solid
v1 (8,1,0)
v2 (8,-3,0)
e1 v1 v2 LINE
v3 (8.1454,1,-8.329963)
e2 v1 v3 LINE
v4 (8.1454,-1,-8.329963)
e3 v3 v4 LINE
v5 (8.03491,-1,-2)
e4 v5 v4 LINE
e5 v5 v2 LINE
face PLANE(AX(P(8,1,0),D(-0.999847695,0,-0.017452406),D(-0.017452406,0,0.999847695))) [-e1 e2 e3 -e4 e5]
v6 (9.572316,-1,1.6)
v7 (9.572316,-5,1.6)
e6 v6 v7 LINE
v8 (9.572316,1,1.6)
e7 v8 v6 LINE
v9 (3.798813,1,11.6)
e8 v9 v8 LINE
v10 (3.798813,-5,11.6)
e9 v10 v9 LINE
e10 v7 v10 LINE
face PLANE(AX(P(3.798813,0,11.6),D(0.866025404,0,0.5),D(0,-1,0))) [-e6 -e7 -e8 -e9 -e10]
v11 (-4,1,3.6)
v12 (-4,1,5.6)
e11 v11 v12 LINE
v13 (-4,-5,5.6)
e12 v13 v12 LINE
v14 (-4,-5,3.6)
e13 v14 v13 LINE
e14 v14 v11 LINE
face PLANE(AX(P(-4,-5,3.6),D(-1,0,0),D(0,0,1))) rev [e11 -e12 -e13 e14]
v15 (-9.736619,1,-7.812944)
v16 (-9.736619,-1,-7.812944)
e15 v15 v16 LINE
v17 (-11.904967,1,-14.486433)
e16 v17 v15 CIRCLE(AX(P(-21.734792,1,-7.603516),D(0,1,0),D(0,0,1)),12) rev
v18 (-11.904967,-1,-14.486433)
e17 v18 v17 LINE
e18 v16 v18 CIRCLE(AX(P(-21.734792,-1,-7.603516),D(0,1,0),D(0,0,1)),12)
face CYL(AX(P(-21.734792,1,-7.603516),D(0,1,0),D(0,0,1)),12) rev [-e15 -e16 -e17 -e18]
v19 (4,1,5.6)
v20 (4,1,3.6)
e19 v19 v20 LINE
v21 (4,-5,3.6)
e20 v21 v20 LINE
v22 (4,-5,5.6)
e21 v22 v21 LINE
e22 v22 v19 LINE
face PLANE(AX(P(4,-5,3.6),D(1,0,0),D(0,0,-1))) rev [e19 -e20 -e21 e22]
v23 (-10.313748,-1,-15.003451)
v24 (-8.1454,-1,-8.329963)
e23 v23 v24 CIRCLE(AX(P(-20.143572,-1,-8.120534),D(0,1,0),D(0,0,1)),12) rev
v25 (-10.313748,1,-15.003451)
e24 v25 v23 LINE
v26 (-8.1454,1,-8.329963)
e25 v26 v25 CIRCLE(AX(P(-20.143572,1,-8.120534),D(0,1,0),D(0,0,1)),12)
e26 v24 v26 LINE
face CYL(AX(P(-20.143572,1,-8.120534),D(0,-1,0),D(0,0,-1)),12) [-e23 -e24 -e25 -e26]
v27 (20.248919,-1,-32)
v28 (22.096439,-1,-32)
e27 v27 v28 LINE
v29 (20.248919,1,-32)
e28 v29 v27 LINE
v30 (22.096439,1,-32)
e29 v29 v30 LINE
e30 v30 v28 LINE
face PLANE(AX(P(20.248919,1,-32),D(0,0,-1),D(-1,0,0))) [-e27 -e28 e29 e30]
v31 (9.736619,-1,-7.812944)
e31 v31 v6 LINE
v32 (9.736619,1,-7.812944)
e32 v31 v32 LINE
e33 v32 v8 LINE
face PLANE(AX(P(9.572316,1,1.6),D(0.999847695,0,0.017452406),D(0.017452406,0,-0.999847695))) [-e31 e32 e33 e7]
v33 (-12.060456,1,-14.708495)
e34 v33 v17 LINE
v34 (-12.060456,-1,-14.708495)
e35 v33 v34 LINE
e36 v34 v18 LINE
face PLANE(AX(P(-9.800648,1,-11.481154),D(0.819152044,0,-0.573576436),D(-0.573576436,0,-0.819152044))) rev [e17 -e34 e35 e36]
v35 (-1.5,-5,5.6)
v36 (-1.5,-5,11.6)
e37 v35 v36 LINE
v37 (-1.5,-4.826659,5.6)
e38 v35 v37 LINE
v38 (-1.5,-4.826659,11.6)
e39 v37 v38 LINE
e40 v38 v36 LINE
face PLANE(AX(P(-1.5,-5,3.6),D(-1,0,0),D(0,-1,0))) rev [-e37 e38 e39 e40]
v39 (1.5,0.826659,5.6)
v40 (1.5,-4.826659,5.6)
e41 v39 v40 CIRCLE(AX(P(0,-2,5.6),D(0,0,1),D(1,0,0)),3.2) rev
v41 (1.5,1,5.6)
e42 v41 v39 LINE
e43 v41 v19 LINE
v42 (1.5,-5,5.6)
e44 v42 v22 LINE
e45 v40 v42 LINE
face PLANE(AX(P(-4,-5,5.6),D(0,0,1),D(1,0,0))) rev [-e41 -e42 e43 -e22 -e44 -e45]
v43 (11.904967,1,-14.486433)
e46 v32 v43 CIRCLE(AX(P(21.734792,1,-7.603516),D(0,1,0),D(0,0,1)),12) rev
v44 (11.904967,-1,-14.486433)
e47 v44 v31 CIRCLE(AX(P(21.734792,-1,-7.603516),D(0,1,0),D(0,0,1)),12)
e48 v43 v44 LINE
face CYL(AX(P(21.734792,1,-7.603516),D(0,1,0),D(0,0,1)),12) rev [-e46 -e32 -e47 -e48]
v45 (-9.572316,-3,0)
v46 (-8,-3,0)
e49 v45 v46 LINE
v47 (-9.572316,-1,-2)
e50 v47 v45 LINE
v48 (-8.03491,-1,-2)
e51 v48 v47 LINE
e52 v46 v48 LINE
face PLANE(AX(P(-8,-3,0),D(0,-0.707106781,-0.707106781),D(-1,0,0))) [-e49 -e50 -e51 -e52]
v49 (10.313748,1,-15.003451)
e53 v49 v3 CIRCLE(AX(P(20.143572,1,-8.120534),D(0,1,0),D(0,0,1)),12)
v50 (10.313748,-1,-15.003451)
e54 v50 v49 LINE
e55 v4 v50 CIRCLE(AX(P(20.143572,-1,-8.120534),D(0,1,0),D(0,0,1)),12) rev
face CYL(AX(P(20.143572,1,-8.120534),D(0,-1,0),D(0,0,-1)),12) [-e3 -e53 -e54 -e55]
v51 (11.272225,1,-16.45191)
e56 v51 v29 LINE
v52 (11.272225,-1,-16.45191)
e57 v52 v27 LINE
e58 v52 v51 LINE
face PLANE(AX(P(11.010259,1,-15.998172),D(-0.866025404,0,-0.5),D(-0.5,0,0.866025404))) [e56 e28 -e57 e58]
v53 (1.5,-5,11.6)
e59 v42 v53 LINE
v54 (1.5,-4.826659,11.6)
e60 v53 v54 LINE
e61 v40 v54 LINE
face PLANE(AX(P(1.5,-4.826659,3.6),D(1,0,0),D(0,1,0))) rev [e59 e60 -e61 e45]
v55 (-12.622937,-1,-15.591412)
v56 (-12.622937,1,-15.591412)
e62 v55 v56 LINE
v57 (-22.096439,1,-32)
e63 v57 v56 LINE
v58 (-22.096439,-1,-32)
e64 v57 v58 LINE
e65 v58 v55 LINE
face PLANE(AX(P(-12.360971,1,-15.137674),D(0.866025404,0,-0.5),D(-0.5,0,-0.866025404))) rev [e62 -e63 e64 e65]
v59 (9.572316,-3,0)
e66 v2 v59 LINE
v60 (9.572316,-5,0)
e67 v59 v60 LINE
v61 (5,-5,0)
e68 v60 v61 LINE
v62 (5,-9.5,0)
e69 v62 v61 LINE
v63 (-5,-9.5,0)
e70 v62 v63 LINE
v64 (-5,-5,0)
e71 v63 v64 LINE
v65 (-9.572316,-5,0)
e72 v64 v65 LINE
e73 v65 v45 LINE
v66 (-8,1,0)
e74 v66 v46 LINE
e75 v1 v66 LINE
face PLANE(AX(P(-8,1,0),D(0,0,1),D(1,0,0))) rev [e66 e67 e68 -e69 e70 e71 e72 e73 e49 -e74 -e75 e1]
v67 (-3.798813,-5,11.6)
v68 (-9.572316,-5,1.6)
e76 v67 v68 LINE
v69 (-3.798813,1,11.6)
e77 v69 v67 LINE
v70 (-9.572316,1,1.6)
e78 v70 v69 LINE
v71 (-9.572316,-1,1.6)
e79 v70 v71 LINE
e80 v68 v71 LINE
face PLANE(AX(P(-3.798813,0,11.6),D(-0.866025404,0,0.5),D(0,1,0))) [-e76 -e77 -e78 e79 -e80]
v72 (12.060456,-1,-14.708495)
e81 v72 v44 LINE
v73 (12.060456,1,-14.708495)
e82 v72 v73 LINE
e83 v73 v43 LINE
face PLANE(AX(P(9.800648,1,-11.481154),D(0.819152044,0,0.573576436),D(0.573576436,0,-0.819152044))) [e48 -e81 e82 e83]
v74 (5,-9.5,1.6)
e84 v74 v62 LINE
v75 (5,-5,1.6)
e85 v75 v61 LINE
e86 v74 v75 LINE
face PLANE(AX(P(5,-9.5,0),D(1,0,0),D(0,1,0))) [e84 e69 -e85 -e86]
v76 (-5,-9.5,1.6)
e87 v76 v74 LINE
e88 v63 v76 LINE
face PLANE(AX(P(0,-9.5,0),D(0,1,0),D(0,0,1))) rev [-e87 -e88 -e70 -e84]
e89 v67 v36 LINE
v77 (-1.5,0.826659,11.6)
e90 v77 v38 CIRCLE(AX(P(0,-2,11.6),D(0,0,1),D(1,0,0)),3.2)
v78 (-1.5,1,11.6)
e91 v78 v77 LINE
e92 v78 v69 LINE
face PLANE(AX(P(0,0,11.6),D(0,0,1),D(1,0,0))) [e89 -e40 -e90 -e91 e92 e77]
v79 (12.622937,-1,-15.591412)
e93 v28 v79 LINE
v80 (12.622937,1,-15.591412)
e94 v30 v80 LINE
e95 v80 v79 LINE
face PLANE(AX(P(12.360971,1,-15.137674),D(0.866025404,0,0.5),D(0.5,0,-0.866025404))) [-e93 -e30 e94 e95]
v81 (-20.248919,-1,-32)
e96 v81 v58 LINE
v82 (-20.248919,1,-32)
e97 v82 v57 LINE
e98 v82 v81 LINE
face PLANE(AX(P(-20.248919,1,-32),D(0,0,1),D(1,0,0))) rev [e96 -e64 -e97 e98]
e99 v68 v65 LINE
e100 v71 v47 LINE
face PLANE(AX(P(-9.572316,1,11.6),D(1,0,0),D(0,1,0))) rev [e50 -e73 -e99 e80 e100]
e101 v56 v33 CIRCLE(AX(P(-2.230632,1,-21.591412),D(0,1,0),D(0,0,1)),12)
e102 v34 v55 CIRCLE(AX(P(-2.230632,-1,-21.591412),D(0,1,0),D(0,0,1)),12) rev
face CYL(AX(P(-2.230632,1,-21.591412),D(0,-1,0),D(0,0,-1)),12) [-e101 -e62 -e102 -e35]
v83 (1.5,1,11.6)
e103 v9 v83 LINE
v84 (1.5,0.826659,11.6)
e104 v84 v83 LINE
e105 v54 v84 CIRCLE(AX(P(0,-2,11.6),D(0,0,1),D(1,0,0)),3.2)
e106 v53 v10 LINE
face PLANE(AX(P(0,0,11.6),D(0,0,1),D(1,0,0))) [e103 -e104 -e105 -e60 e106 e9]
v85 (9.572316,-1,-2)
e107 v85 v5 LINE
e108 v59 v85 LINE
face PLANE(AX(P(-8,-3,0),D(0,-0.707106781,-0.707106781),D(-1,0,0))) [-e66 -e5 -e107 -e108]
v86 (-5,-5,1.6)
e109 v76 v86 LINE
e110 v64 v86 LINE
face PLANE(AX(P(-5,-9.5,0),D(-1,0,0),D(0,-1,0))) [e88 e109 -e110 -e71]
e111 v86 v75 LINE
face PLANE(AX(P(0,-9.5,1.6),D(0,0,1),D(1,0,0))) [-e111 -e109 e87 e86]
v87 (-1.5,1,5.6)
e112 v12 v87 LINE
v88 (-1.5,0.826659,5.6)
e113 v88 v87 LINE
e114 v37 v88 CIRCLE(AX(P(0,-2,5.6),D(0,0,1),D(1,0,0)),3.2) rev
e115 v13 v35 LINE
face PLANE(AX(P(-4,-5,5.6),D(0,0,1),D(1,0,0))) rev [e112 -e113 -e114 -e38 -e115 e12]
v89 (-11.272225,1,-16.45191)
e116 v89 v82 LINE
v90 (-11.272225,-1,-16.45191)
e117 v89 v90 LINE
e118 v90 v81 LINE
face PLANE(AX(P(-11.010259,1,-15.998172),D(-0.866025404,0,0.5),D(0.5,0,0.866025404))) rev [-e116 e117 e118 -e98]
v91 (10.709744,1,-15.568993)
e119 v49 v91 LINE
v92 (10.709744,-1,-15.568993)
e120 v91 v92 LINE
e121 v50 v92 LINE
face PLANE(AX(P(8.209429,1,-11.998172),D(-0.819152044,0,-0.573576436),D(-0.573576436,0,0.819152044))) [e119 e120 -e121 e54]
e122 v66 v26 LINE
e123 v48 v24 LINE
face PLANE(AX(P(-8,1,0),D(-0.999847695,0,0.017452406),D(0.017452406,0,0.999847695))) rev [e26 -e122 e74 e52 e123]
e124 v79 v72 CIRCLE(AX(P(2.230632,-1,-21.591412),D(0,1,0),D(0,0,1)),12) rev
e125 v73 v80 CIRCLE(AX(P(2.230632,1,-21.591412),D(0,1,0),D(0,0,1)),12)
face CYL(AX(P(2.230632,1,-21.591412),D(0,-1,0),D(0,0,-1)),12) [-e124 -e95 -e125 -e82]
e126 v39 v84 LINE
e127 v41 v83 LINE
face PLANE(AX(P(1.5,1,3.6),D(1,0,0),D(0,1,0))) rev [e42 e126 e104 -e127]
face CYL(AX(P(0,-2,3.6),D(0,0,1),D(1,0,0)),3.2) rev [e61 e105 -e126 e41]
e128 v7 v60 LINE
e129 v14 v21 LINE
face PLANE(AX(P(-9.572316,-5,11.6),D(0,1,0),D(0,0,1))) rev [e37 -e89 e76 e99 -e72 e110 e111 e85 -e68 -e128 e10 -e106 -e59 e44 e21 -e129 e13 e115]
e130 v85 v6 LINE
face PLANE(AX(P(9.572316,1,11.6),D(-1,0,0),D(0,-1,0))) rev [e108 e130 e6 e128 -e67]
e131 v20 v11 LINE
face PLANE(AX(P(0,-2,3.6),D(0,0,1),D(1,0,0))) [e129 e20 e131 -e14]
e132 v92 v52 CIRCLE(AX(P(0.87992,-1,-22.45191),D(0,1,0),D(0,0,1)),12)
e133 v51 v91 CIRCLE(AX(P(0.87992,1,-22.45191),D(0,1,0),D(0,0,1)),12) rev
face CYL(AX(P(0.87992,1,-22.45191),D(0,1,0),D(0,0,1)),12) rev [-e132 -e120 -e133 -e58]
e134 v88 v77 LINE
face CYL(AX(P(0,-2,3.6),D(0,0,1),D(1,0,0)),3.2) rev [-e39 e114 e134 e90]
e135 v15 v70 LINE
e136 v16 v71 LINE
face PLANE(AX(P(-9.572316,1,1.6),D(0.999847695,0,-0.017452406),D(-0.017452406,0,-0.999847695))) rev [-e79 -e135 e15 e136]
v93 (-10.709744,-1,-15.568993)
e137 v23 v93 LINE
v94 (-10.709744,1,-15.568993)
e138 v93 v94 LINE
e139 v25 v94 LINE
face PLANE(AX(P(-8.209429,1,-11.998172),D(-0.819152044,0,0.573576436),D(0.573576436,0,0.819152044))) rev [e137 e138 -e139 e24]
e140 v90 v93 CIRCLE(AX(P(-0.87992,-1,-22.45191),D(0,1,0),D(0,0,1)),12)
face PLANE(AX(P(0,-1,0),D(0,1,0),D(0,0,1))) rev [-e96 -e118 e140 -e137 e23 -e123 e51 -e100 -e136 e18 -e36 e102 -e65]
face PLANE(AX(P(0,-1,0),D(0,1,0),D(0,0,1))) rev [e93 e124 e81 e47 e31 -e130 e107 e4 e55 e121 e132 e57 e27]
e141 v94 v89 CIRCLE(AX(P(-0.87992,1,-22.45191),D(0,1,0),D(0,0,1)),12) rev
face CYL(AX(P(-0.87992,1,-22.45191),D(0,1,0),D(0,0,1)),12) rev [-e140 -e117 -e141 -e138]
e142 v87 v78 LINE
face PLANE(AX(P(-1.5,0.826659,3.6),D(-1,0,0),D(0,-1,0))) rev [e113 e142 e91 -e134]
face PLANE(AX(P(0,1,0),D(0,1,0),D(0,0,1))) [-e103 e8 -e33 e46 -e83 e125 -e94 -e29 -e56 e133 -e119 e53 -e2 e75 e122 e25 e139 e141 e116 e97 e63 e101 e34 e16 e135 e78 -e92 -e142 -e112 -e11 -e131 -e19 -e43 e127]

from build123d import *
from OCP.BRepFilletAPI import BRepFilletAPI_MakeChamfer

# Parameters (mm, degrees)
BOSS_EXTRUDE1_DEPTH             = 1
BOSS_EXTRUDE2_REACH             = 42.227
SKETCH2_W                       = 19.144631242
SKETCH2_H                       = 6
BOSS_EXTRUDE2_DIRECTION_2_DEPTH = 10
CUT_EXTRUDE1_DEPTH              = 8
CUT_EXTRUDE2_DEPTH              = 40.207813431
CUT_EXTRUDE2_DEPTH_BACK         = 40.207813431
SKETCH4_W                       = 8
SKETCH4_H                       = 2
CHAMFER1_SIZE                   = 2
CHAMFER2_SIZE                   = 10
CHAMFER2_SIZE2                  = 5.773502692
FILLET1_START                   = -1
FILLET1_DEPTH                   = 3
FILLET1_2_DEPTH                 = 2
BOSS_EXTRUDE3_START             = -6
SKETCH5_W                       = 10
SKETCH5_H                       = 1.6
BOSS_EXTRUDE3_DEPTH             = 10.5


with BuildPart() as part:
    # Sketch1 → Boss-Extrude1 (new, symmetric)
    with BuildSketch(Plane(origin=(0, 0, 0), x_dir=(1, 0, 0), z_dir=(0, 1, 0))):
        Polygon((-8, 0), (0, 0), (0, -1.6), (-9.572315621, -1.6), (-9.800648012, 11.481153904), (-12.360970922, 15.137673965), (-22.096439397, 32), (-20.248918536, 32), (-11.01025903, 15.998172342), (-8.209428877, 11.998172342), align=None)
    boss_extrude1 = extrude(amount=BOSS_EXTRUDE1_DEPTH, both=True)

    # Mirror1: Boss-Extrude1 across plane
    add(boss_extrude1.mirror(Plane(origin=(0, 1, 0), x_dir=(0, 0, 1), z_dir=(-1, 0, 0))))

    # Boss-Extrude2: up to this face of the body (flat: up to its plane)
    boss_extrude2_end = Plane(part.part.faces().sort_by_distance((0, 0, 0))[0])
    # Sketch2 → Boss-Extrude2 (add, up to the picked face)
    with BuildSketch(Plane.XY.offset(1.6), mode=Mode.PRIVATE) as boss_extrude2_sk1:
        with Locations((0, -2)):
            Rectangle(SKETCH2_W, SKETCH2_H)
    boss_extrude2_tool1 = split(extrude(boss_extrude2_sk1.sketch, amount=-BOSS_EXTRUDE2_REACH, mode=Mode.PRIVATE), bisect_by=boss_extrude2_end, keep=Keep.BOTH, mode=Mode.PRIVATE)
    add(boss_extrude2_tool1.solids().sort_by(Axis((0, -2, 1.6), (0, 0, -1)))[0])

    # Sketch2 → Boss-Extrude2 direction 2 (add)
    with BuildSketch(Plane.XY.offset(1.6)):
        with Locations((0, -2)):
            Rectangle(SKETCH2_W, SKETCH2_H)
    extrude(amount=BOSS_EXTRUDE2_DIRECTION_2_DEPTH)

    # Sketch3 → Cut-Extrude1 (cut)
    with BuildSketch(Plane.XY.offset(11.6)):
        with BuildLine():
            Line((-1.5, 0.826658805), (-1.5, 1))
            Line((-1.5, 1), (1.5, 1))
            Line((1.5, 1), (1.5, 0.826658805))
            ThreePointArc((1.5, 0.826658805), (3.2, -2), (1.5, -4.826658805))
            Line((1.5, -4.826658805), (1.5, -5))
            Line((1.5, -5), (-1.5, -5))
            Line((-1.5, -5), (-1.5, -4.826658805))
            ThreePointArc((-1.5, -4.826658805), (-3.2, -2), (-1.5, 0.826658805))
        make_face()
    extrude(amount=-CUT_EXTRUDE1_DEPTH, mode=Mode.SUBTRACT)

    # Sketch4 → Cut-Extrude2 (cut, two sides: drawn at the far end of the back side and taken through both)
    with BuildSketch(Plane(origin=(0, 0, 0), x_dir=(1, 0, 0), z_dir=(0, 1, 0)).offset(-CUT_EXTRUDE2_DEPTH_BACK)):
        with Locations((0, -4.6)):
            Rectangle(SKETCH4_W, SKETCH4_H)
    extrude(amount=CUT_EXTRUDE2_DEPTH + CUT_EXTRUDE2_DEPTH_BACK, mode=Mode.SUBTRACT)

    # Chamfer1
    chamfer1_edges = [part.edges().sort_by_distance(p)[0] for p in [
        (-8.78615781, -1, 0),
        (8.78615781, -1, 0),
    ]]
    chamfer(chamfer1_edges, length=CHAMFER1_SIZE)

    # Chamfer2: one chamfer whose edges measure the first distance from different faces: ONE call of the kernel's chamfer builder (chamfer() names one face for all edges)
    chamfer2_edges_1 = [part.edges().sort_by_distance(p)[0] for p in [
        (9.572315621, -2, 11.6),
    ]]
    chamfer2_side_1 = [part.faces().sort_by_distance(p)[0] for p in [
        (9.572315621, -2.083820663, 5.844834308),
    ]]
    chamfer2_edges_2 = [part.edges().sort_by_distance(p)[0] for p in [
        (-9.572315621, -2, 11.6),
    ]]
    chamfer2_side_2 = [part.faces().sort_by_distance(p)[0] for p in [
        (-9.572315621, -2.083820663, 5.844834308),
    ]]
    chamfer2 = BRepFilletAPI_MakeChamfer(part.part.solid().wrapped)
    for e in chamfer2_edges_1:
        chamfer2.Add(CHAMFER2_SIZE, CHAMFER2_SIZE2, e.wrapped, chamfer2_side_1[0].wrapped)  # the first distance lies on this face
    for e in chamfer2_edges_2:
        chamfer2.Add(CHAMFER2_SIZE, CHAMFER2_SIZE2, e.wrapped, chamfer2_side_2[0].wrapped)  # the first distance lies on this face
    add(Compound.cast(chamfer2.Shape()), mode=Mode.REPLACE)

    # Fillet1: read off the stored shape, not the designer's step
    # Fillet1 outline → Fillet1 (cut)
    with BuildSketch(Plane(origin=(0, 0, 0), x_dir=(1, 0, 0), z_dir=(0, 1, 0)).offset(FILLET1_START)):
        with BuildLine():
            Line((12.360970922, 15.137673965), (12.622936579, 15.591411793))
            ThreePointArc((12.622936579, 15.591411793), (12.351329084, 15.143816493), (12.060456265, 14.708494557))
            Line((12.060456265, 14.708494557), (12.360970922, 15.137673965))
        make_face()
        with BuildLine():
            ThreePointArc((8.145400044, 8.329962936), (8.73089419, 11.828737991), (10.313747854, 15.003451295))
            Line((10.313747854, 15.003451295), (8.209428877, 11.998172342))
            Line((8.209428877, 11.998172342), (8.145400044, 8.329962936))
        make_face()
        with BuildLine():
            Line((-12.360970922, 15.137673965), (-12.060456265, 14.708494557))
            ThreePointArc((-12.060456265, 14.708494557), (-12.351329084, 15.143816493), (-12.622936579, 15.591411793))
            Line((-12.622936579, 15.591411793), (-12.360970922, 15.137673965))
        make_face()
        with BuildLine():
            Line((-8.209428877, 11.998172342), (-10.313747854, 15.003451295))
            ThreePointArc((-10.313747854, 15.003451295), (-8.73089419, 11.828737991), (-8.145400044, 8.329962936))
            Line((-8.145400044, 8.329962936), (-8.209428877, 11.998172342))
        make_face()
    extrude(amount=FILLET1_DEPTH, mode=Mode.SUBTRACT)

    # Fillet1 2 outline → Fillet1 2 (add)
    with BuildSketch(Plane(origin=(0, 0, 0), x_dir=(1, 0, 0), z_dir=(0, 1, 0)).offset(FILLET1_START)):
        with BuildLine():
            ThreePointArc((9.736619178, 7.812944498), (10.322113325, 11.311719553), (11.904966989, 14.486432857))
            Line((11.904966989, 14.486432857), (9.800648012, 11.481153904))
            Line((9.800648012, 11.481153904), (9.736619178, 7.812944498))
        make_face()
        with BuildLine():
            ThreePointArc((11.272224688, 16.45191017), (11.000617192, 16.00431487), (10.709744374, 15.568992934))
            Line((10.709744374, 15.568992934), (11.01025903, 15.998172342))
            Line((11.01025903, 15.998172342), (11.272224688, 16.45191017))
        make_face()
        with BuildLine():
            Line((-9.800648012, 11.481153904), (-11.904966989, 14.486432857))
            ThreePointArc((-11.904966989, 14.486432857), (-10.322113325, 11.311719553), (-9.736619178, 7.812944498))
            Line((-9.736619178, 7.812944498), (-9.800648012, 11.481153904))
        make_face()
        with BuildLine():
            ThreePointArc((-10.709744374, 15.568992934), (-11.000617192, 16.00431487), (-11.272224688, 16.45191017))
            Line((-11.272224688, 16.45191017), (-11.01025903, 15.998172342))
            Line((-11.01025903, 15.998172342), (-10.709744374, 15.568992934))
        make_face()
    extrude(amount=FILLET1_2_DEPTH)

    # Sketch5 → Boss-Extrude3 (add)
    with BuildSketch(Plane.XZ.offset(5).offset(BOSS_EXTRUDE3_START)):
        with Locations((0, 0.8)):
            Rectangle(SKETCH5_W, SKETCH5_H)
    extrude(amount=BOSS_EXTRUDE3_DEPTH)


solid = part.part
